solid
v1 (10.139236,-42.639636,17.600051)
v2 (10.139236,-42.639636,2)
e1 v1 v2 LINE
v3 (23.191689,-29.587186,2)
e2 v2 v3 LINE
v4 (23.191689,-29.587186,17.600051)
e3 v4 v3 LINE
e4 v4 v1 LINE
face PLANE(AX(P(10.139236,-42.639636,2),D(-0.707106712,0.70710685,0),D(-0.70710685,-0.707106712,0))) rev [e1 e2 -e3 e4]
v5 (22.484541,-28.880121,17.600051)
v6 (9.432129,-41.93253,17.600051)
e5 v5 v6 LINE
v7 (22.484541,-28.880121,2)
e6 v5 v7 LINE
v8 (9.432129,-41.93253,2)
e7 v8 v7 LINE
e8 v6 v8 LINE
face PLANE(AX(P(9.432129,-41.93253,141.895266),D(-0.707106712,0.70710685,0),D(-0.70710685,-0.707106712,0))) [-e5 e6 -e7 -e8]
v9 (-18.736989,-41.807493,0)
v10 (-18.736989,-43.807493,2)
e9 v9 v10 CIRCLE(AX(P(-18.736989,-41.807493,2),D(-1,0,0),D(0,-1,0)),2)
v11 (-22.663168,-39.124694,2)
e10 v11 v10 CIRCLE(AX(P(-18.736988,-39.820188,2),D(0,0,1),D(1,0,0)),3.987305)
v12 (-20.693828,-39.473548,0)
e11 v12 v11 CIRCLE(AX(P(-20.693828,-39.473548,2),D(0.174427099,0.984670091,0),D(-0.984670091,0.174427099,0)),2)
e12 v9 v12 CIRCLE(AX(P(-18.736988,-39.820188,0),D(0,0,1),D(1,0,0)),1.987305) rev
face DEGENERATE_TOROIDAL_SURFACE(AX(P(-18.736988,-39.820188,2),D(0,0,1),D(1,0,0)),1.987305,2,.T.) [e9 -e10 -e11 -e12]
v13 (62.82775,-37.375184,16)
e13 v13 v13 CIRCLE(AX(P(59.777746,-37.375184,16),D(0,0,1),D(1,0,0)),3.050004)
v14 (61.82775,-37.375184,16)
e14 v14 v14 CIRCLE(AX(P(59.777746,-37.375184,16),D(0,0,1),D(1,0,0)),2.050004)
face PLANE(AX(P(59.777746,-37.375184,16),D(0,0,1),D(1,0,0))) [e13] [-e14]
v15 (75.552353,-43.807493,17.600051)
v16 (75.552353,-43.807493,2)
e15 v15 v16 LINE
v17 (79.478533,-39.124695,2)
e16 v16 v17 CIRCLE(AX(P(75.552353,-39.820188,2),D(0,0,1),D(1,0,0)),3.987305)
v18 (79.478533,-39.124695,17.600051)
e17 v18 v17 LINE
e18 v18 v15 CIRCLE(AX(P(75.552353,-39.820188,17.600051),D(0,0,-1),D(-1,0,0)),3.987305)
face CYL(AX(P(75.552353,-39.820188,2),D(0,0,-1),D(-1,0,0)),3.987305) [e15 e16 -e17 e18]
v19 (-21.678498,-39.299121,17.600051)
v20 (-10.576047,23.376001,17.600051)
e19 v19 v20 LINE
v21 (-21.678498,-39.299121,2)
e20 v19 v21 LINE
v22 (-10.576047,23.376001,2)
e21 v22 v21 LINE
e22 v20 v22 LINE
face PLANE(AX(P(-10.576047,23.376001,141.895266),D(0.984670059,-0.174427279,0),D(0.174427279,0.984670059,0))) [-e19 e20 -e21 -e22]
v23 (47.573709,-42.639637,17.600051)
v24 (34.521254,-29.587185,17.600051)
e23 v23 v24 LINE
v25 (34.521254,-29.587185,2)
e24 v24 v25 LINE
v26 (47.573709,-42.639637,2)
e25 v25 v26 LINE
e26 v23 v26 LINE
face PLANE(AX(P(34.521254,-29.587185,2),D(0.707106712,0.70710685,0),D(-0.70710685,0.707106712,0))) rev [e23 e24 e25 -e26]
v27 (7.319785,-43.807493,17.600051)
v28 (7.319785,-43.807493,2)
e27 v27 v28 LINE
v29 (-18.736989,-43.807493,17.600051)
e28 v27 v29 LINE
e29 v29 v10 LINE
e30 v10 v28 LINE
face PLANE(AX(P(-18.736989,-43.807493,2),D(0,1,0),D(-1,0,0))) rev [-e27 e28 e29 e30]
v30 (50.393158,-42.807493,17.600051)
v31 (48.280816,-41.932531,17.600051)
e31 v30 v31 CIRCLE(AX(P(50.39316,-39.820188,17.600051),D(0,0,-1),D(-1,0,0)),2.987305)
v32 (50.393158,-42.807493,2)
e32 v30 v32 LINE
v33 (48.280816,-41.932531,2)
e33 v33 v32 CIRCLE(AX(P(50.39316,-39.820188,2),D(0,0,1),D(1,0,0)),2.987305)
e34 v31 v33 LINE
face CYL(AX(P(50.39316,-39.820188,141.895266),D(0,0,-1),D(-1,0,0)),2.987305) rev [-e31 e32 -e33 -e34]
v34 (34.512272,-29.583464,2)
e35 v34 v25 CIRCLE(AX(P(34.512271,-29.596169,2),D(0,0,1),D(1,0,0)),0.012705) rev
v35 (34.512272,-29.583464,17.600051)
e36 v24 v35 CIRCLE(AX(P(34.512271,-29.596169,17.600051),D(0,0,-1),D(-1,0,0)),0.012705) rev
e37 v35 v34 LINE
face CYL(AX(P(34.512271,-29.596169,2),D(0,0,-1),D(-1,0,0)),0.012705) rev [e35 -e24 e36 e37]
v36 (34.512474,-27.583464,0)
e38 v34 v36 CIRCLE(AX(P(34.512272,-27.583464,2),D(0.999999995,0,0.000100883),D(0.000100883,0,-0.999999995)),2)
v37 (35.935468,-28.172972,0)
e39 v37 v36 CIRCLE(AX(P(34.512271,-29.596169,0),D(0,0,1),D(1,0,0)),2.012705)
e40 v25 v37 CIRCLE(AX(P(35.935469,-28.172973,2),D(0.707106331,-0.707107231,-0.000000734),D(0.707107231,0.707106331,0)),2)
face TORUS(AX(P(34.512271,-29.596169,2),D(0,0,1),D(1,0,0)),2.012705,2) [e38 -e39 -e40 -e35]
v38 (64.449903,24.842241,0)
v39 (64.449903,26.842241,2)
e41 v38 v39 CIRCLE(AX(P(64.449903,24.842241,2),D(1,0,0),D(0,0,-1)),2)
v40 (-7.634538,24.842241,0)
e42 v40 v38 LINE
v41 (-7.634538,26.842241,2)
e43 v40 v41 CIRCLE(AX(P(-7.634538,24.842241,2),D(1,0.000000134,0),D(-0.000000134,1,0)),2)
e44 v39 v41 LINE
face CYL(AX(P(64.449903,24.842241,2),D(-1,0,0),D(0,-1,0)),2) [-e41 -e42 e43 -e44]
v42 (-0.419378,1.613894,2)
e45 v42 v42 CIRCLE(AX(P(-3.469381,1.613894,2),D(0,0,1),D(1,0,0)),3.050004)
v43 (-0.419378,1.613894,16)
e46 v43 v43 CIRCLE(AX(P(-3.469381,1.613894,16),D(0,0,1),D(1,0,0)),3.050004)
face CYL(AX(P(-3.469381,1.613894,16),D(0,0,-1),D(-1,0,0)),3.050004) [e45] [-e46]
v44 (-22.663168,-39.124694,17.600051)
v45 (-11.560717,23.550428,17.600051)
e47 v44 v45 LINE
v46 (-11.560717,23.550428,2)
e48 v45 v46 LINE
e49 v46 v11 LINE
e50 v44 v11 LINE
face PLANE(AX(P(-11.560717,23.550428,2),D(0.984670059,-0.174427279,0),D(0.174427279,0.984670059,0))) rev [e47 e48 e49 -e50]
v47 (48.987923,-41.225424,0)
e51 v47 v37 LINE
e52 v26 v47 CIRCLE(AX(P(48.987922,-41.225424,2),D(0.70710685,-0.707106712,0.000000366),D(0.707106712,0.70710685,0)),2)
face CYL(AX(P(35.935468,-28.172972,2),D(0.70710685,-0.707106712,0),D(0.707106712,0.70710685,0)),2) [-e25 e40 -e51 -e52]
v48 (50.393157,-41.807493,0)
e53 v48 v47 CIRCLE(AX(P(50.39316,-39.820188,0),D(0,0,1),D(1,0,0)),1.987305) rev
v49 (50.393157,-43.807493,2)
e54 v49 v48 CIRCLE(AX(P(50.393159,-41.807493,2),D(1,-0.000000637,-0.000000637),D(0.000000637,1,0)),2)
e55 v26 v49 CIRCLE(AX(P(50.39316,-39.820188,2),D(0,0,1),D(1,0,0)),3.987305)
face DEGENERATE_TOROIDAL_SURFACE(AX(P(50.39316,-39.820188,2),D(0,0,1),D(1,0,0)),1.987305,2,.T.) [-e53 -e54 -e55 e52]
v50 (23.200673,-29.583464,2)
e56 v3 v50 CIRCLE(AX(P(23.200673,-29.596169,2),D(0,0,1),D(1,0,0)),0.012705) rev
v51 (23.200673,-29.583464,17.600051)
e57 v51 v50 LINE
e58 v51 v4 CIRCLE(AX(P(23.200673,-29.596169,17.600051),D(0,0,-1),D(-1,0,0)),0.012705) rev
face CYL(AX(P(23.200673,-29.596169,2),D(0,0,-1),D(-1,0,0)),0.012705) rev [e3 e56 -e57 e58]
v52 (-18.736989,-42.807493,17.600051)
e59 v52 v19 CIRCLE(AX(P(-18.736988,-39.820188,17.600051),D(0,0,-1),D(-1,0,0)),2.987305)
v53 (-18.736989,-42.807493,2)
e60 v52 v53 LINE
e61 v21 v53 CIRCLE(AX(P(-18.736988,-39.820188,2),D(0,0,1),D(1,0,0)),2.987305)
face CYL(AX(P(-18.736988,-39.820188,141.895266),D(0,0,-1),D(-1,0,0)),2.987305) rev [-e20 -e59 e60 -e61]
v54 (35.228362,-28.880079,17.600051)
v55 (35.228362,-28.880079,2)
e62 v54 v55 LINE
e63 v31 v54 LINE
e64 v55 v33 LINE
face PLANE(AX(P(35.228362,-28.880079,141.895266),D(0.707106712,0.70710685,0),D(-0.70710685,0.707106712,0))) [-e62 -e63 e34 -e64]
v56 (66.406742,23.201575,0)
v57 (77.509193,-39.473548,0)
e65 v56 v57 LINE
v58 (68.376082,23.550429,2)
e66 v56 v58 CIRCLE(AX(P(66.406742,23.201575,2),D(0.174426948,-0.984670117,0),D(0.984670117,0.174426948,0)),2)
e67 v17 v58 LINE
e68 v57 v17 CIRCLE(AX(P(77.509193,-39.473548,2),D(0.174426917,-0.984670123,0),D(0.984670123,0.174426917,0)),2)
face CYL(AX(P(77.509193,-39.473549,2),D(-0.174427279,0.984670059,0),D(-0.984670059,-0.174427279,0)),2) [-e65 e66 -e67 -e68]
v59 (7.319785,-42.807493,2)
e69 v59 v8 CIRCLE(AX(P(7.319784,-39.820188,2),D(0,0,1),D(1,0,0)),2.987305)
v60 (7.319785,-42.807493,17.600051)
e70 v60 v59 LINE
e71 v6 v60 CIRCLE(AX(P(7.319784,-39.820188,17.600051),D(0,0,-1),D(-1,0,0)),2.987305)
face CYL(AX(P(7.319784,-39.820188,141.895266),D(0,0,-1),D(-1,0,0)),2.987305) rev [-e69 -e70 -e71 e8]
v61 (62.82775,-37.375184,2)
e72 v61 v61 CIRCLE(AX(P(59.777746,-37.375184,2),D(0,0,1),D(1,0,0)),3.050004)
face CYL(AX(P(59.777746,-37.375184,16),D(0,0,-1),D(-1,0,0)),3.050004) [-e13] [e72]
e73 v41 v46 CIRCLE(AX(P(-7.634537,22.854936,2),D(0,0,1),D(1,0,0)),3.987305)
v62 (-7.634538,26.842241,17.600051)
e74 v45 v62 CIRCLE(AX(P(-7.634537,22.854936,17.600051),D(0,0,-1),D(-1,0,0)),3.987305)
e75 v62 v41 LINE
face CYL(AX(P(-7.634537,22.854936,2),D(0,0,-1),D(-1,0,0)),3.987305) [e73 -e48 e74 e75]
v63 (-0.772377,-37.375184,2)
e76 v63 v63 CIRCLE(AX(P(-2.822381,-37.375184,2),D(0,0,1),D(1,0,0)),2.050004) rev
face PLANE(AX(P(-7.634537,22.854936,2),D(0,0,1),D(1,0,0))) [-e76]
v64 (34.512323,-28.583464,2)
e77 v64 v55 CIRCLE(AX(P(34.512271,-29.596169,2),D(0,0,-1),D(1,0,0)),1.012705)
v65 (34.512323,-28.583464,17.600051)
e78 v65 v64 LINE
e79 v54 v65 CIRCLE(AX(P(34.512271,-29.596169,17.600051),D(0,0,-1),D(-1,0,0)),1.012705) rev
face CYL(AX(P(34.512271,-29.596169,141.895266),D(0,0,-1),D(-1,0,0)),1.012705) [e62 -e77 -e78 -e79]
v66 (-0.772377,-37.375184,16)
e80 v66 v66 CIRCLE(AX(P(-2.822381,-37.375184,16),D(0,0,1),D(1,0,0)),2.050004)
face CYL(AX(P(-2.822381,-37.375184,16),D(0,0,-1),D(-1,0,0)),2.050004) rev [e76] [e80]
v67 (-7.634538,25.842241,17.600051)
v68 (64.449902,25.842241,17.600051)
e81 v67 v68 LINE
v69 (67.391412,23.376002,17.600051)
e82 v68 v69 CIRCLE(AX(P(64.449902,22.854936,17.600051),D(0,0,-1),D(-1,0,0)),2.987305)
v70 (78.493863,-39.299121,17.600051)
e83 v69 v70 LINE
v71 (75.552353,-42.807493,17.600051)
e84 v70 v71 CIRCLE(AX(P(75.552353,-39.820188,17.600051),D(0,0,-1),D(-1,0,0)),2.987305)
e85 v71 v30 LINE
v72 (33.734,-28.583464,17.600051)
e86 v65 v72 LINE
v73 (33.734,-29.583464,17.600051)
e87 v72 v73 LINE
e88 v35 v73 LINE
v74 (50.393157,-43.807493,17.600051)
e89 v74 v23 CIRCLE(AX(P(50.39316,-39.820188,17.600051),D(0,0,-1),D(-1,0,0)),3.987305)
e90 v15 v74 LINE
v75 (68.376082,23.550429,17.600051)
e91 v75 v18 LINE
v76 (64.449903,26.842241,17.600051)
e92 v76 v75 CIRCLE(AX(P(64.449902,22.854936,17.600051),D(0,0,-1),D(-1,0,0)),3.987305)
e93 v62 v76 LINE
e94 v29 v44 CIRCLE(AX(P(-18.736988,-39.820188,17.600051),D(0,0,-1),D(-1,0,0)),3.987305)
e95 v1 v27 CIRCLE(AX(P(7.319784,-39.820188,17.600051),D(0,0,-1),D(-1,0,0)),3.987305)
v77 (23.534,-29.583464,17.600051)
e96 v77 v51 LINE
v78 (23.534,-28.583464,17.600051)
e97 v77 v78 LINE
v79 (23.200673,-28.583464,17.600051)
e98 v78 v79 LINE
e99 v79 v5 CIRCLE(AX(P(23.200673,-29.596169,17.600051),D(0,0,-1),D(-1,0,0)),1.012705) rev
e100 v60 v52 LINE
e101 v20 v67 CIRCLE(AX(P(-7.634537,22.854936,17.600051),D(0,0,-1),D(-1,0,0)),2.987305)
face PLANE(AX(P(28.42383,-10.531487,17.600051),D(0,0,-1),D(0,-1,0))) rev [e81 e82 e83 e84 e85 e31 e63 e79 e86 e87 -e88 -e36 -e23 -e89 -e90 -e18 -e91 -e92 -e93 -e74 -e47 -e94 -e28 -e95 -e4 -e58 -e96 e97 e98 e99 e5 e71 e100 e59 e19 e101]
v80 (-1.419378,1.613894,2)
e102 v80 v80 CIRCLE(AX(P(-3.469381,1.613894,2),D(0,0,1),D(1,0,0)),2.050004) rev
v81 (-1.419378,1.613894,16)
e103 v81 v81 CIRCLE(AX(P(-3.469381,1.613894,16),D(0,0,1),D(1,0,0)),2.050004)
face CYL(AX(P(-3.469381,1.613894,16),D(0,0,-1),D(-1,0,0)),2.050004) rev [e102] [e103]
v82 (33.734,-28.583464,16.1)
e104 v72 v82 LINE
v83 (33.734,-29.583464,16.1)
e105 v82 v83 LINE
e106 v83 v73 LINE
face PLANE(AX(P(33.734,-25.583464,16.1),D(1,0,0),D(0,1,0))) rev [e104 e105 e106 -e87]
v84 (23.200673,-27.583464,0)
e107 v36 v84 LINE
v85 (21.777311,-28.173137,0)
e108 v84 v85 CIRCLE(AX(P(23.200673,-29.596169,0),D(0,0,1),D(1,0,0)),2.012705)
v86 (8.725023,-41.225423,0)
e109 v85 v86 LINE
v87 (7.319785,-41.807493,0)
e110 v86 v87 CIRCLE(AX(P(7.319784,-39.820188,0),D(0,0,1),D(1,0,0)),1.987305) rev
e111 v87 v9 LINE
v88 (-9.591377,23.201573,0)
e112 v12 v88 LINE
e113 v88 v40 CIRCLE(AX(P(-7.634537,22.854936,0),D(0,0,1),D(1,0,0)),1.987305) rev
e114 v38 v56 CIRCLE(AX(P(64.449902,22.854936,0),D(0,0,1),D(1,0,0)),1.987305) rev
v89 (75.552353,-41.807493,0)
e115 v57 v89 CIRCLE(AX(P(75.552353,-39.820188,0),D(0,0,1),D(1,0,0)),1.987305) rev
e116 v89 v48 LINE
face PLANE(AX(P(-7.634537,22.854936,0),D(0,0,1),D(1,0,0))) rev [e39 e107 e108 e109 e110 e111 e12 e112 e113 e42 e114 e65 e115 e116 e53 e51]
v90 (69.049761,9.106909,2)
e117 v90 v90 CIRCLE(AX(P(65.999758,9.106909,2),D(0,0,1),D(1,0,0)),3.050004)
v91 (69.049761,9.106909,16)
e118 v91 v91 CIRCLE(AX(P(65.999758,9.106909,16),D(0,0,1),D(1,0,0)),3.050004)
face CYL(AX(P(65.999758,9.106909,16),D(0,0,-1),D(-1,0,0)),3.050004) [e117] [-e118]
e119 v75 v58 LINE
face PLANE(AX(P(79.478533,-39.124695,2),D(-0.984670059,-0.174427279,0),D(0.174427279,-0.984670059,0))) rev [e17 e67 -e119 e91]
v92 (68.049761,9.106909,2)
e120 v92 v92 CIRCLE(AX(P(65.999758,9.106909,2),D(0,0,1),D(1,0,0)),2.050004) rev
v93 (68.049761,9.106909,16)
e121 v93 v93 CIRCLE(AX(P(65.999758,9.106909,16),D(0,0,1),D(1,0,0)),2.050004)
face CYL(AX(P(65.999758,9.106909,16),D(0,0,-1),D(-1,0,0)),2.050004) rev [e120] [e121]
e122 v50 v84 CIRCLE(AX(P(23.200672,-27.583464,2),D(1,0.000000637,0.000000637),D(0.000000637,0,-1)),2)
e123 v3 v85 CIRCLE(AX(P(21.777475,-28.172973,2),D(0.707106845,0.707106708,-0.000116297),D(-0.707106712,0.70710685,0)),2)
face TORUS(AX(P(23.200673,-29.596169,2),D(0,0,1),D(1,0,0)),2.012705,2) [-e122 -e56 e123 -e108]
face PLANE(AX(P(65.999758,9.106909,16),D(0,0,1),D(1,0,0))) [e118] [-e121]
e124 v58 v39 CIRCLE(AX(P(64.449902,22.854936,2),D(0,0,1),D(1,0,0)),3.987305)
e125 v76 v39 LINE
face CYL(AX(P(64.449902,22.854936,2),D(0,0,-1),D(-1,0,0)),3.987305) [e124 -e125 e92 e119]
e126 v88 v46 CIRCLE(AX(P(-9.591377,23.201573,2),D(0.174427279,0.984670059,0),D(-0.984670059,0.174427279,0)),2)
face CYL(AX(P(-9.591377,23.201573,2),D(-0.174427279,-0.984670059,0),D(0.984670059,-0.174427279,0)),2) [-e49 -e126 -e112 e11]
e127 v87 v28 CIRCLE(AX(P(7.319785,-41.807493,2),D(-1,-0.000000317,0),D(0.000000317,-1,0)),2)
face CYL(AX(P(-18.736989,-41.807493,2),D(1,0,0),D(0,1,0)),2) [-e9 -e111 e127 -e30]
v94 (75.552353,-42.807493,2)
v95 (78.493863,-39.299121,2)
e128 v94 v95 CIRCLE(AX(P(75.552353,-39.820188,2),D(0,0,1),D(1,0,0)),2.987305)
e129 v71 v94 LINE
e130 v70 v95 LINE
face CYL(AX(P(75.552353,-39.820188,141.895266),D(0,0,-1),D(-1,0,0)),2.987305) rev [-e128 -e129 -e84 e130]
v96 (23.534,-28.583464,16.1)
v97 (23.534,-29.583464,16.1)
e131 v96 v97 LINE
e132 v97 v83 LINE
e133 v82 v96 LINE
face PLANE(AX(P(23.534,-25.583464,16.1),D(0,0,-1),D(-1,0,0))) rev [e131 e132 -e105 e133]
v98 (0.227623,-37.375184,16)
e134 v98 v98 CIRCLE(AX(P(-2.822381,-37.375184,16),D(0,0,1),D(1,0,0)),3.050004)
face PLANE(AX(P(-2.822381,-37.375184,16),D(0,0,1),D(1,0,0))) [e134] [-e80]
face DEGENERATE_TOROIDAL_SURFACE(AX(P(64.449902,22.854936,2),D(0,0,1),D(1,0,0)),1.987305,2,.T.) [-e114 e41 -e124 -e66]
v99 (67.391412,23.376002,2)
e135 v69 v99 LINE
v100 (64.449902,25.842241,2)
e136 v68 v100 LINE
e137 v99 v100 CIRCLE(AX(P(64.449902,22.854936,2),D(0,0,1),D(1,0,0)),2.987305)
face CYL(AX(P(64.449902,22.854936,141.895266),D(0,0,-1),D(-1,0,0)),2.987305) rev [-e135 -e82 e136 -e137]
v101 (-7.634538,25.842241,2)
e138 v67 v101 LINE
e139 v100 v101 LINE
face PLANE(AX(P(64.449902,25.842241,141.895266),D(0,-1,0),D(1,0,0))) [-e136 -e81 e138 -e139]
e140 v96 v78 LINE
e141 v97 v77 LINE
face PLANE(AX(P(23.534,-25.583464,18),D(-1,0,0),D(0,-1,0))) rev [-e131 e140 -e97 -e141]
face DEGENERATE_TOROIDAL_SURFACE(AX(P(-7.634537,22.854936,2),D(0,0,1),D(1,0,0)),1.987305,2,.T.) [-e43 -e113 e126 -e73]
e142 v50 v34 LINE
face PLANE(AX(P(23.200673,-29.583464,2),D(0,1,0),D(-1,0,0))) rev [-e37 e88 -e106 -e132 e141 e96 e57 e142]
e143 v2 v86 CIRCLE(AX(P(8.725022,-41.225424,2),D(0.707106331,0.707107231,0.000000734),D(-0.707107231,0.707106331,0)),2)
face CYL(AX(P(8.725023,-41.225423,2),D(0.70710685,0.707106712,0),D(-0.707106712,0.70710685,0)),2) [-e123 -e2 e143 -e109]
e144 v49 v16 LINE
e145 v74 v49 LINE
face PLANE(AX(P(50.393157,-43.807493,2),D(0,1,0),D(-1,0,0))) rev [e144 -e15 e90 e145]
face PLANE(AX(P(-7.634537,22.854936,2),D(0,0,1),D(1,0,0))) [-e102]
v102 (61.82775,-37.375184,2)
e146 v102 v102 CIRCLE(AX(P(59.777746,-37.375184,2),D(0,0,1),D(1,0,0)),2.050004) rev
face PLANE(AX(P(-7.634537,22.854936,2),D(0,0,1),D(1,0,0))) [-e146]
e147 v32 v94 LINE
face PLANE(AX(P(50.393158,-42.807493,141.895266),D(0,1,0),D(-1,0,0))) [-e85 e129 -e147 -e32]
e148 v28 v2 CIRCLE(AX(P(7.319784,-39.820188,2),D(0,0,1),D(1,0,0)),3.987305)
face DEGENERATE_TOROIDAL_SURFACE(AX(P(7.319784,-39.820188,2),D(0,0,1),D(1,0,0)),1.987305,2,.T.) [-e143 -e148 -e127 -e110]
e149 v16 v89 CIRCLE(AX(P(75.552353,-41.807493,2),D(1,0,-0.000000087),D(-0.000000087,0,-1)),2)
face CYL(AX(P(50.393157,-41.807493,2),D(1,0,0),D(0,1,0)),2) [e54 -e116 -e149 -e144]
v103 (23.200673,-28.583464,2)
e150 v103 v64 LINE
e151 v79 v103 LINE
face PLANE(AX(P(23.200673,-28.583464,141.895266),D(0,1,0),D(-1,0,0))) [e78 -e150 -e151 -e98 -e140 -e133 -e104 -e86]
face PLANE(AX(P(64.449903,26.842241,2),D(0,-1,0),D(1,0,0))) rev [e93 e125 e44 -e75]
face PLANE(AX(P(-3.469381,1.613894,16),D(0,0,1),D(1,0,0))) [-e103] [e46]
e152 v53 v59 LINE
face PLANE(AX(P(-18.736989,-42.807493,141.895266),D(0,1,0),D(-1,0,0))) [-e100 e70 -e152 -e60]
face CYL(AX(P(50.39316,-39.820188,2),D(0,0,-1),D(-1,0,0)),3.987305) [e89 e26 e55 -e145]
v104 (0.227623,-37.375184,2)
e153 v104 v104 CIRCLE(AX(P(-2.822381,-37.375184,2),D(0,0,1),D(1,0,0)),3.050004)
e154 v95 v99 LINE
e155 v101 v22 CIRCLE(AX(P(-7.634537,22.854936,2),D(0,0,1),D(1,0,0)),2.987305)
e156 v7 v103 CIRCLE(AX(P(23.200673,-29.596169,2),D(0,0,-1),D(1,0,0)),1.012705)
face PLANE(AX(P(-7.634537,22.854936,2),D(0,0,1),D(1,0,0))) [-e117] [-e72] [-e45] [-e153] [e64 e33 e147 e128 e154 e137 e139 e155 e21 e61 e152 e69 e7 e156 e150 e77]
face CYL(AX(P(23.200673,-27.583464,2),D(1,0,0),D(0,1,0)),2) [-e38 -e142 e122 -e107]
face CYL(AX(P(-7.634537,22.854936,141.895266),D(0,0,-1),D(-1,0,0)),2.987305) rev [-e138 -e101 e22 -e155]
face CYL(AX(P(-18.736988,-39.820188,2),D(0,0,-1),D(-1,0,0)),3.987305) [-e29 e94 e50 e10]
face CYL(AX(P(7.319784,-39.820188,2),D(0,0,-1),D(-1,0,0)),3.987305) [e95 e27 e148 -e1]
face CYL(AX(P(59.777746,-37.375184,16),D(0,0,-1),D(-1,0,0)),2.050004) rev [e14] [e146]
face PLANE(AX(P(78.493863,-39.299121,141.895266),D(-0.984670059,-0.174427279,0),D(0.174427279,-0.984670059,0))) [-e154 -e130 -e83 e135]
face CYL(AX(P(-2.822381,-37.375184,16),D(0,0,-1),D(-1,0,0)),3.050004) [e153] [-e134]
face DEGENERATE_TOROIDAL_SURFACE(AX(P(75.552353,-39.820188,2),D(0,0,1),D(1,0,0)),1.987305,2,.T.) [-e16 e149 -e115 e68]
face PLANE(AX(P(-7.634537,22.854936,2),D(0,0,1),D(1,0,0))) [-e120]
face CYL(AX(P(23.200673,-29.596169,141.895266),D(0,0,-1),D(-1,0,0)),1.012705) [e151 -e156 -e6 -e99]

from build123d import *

# Parameters (mm, degrees)
EXTRUDE_1_DEPTH                    = 2
EXTRUDE_2_DEPTH                    = 14
EXTRUDE_3_DEPTH                    = 15.6000508
FILLET_1_R                         = 2
SKETCH_12_W                        = 10.2
SKETCH_12_H                        = 1.9
USB_TYPEC_LOWER_HALF_OPENING_DEPTH = 4


with BuildPart() as part:
    # 草图1 → 凸台-拉伸1 (new body)
    with BuildSketch(Plane.XY):
        with BuildLine():
            Line((-18.736989068, -43.807492656), (7.319785463, -43.807492656))
            ThreePointArc((7.319785463, -43.807492656), (8.845661337, -43.503976443), (10.139236063, -42.639636403))
            Line((10.139236063, -42.639636403), (23.19168867, -29.587186336))
            ThreePointArc((23.19168867, -29.587186336), (23.195810689, -29.58443157), (23.200673199, -29.583464208))
            Line((23.200673199, -29.583464208), (34.512272144, -29.583464208))
            ThreePointArc((34.512272144, -29.583464208), (34.51713329, -29.584431533), (34.521254362, -29.587185298))
            Line((34.521254362, -29.587185298), (47.573709045, -42.639637441))
            ThreePointArc((47.573709045, -42.639637441), (48.867282822, -43.503976481), (50.393157333, -43.807492656))
            Line((50.393157333, -43.807492656), (75.552353414, -43.807492656))
            ThreePointArc((75.552353414, -43.807492656), (78.607819066, -42.38196989), (79.478533005, -39.124694535))
            Line((79.478533005, -39.124694535), (68.376081771, 23.550429382))
            ThreePointArc((68.376081771, 23.550429382), (67.011684276, 25.910401612), (64.449902577, 26.842240644))
            Line((64.449902577, 26.842240644), (-7.634537883, 26.842240644))
            ThreePointArc((-7.634537883, 26.842240644), (-10.196320099, 25.910401179), (-11.560717313, 23.550428053))
            Line((-11.560717313, 23.550428053), (-22.663168183, -39.124693813))
            ThreePointArc((-22.663168183, -39.124693813), (-21.792454719, -42.381969476), (-18.736989068, -43.807492656))
        make_face()
    extrude(amount=EXTRUDE_1_DEPTH)

    # 草图4 → 凸台-拉伸2 (add)
    # profile 1 of 4: a face of its own
    with BuildSketch(Plane.XY.offset(2)):
        with BuildLine():
            ThreePointArc((-5.872384963, -37.375183791), (-2.822381153, -40.425187601), (0.227622657, -37.375183791))
            ThreePointArc((0.227622657, -37.375183791), (-2.822381153, -34.325179981), (-5.872384963, -37.375183791))
        make_face()
        with BuildLine():
            ThreePointArc((-0.772377343, -37.375183791), (-2.822381153, -35.325179981), (-4.872384963, -37.375183791))
            ThreePointArc((-4.872384963, -37.375183791), (-2.822381153, -39.425187601), (-0.772377343, -37.375183791))
        make_face(mode=Mode.SUBTRACT)
    # profile 2 of 4: a face of its own
    with BuildSketch(Plane.XY.offset(2)):
        with BuildLine():
            ThreePointArc((56.727742037, -37.375183791), (59.777745847, -40.425187601), (62.827749657, -37.375183791))
            ThreePointArc((62.827749657, -37.375183791), (59.777745847, -34.325179981), (56.727742037, -37.375183791))
        make_face()
        with BuildLine():
            ThreePointArc((61.827749657, -37.375183791), (59.777745847, -35.325179981), (57.727742037, -37.375183791))
            ThreePointArc((57.727742037, -37.375183791), (59.777745847, -39.425187601), (61.827749657, -37.375183791))
        make_face(mode=Mode.SUBTRACT)
    # profile 3 of 4: a face of its own
    with BuildSketch(Plane.XY.offset(2)):
        with BuildLine():
            ThreePointArc((69.049761341, 9.106909173), (65.999757531, 12.156912983), (62.949753721, 9.106909173))
            ThreePointArc((62.949753721, 9.106909173), (65.999757531, 6.056905363), (69.049761341, 9.106909173))
        make_face()
        with BuildLine():
            ThreePointArc((63.949753721, 9.106909173), (65.999757531, 7.056905363), (68.049761341, 9.106909173))
            ThreePointArc((68.049761341, 9.106909173), (65.999757531, 11.156912983), (63.949753721, 9.106909173))
        make_face(mode=Mode.SUBTRACT)
    # profile 4 of 4: a face of its own
    with BuildSketch(Plane.XY.offset(2)):
        with BuildLine():
            ThreePointArc((-6.519385217, 1.613894187), (-3.469381407, -1.436109623), (-0.419377597, 1.613894187))
            ThreePointArc((-0.419377597, 1.613894187), (-3.469381407, 4.663897997), (-6.519385217, 1.613894187))
        make_face()
        with BuildLine():
            ThreePointArc((-1.419377597, 1.613894187), (-3.469381407, 3.663897997), (-5.519385217, 1.613894187))
            ThreePointArc((-5.519385217, 1.613894187), (-3.469381407, -0.436109623), (-1.419377597, 1.613894187))
        make_face(mode=Mode.SUBTRACT)
    extrude(amount=EXTRUDE_2_DEPTH)

    # 草图6 → 凸台-拉伸3 (add)
    with BuildSketch(Plane.XY.offset(2)):
        with BuildLine():
            Line((-11.560717313, 23.550428053), (-22.663168183, -39.124693813))
            ThreePointArc((-22.663168183, -39.124693813), (-21.792454719, -42.381969476), (-18.736989068, -43.807492656))
            Line((-18.736989068, -43.807492656), (7.319785463, -43.807492656))
            ThreePointArc((7.319785463, -43.807492656), (8.845661337, -43.503976443), (10.139236063, -42.639636403))
            Line((10.139236063, -42.639636403), (23.19168867, -29.587186337))
            ThreePointArc((23.19168867, -29.587186337), (23.195810689, -29.58443157), (23.200673199, -29.583464208))
            Line((23.200673199, -29.583464208), (34.512272144, -29.583464208))
            ThreePointArc((34.512272144, -29.583464208), (34.51713329, -29.584431533), (34.521254362, -29.587185298))
            Line((34.521254362, -29.587185298), (47.573709045, -42.639637441))
            ThreePointArc((47.573709045, -42.639637441), (48.867282822, -43.503976481), (50.393157333, -43.807492656))
            Line((50.393157333, -43.807492656), (75.552353414, -43.807492656))
            ThreePointArc((75.552353414, -43.807492656), (78.607819066, -42.38196989), (79.478533005, -39.124694535))
            Line((79.478533005, -39.124694535), (68.376081771, 23.550429382))
            ThreePointArc((68.376081771, 23.550429382), (67.011684276, 25.910401612), (64.449902577, 26.842240644))
            Line((64.449902577, 26.842240644), (-7.634537883, 26.842240644))
            ThreePointArc((-7.634537883, 26.842240644), (-10.196320099, 25.910401179), (-11.560717313, 23.550428053))
        make_face()
        with BuildLine():
            Line((-10.576047254, 23.376000774), (-21.678498124, -39.299121091))
            ThreePointArc((-21.678498124, -39.299121091), (-21.026156001, -41.739485021), (-18.736988894, -42.807492656))
            Line((-18.736988894, -42.807492656), (7.319785463, -42.807492656))
            ThreePointArc((7.319785463, -42.807492656), (8.462977611, -42.580097033), (9.432128831, -41.932530072))
            Line((9.432128831, -41.932530072), (22.484540842, -28.880120606))
            ThreePointArc((22.484540842, -28.880120606), (22.813100147, -28.660563268), (23.200672562, -28.583464208))
            Line((23.200672562, -28.583464208), (34.512322586, -28.58346421))
            ThreePointArc((34.512322586, -28.58346421), (34.899840317, -28.660561774), (35.228361593, -28.880078967))
            Line((35.228361593, -28.880078967), (48.280815757, -41.932530591))
            ThreePointArc((48.280815757, -41.932530591), (49.249966503, -42.580097051), (50.393157969, -42.807492656))
            Line((50.393157969, -42.807492656), (75.552353414, -42.807492656))
            ThreePointArc((75.552353414, -42.807492656), (77.841520522, -41.739485228), (78.493862882, -39.299121453))
            Line((78.493862882, -39.299121453), (67.391411713, 23.376002103))
            ThreePointArc((67.391411713, 23.376002103), (66.369199703, 25.144102993), (64.449902443, 25.842240644))
            Line((64.449902443, 25.842240644), (-7.634537883, 25.842240644))
            ThreePointArc((-7.634537883, 25.842240644), (-9.553835577, 25.144102517), (-10.576047254, 23.376000774))
        make_face(mode=Mode.SUBTRACT)
    extrude(amount=EXTRUDE_3_DEPTH)

    # 圆角1
    fillet_1_edges = [part.edges().sort_by_distance(p)[0] for p in [
        (28.407682347, 26.842240644, 0),
        (67.011684276, 25.910401612, 0),
        (73.927307388, -7.787132577, 0),
        (78.607819066, -42.38196989, 0),
        (62.972755373, -43.807492656, 0),
        (48.867282822, -43.503976481, 0),
        (41.047481703, -36.11341137, 0),
        (34.51713329, -29.584431533, 0),
        (28.856472671, -29.583464208, 0),
        (23.195810689, -29.58443157, 0),
        (16.665462366, -36.11341137, 0),
        (8.845661337, -43.503976443, 0),
        (-5.708601803, -43.807492656, 0),
        (-21.792454719, -42.381969476, 0),
        (-17.111942748, -7.78713288, 0),
        (-10.196320099, 25.910401179, 0),
    ]]
    fillet(fillet_1_edges, radius=FILLET_1_R - 0.0001)  # a hair under: the kernel refuses the full size

    # 草图12 → USB_TypeC_Lower_Half_Opening (cut)
    with BuildSketch(Plane.XZ.offset(29.583464208)):
        with Locations((28.634, 17.05)):
            Rectangle(SKETCH_12_W, SKETCH_12_H)
    extrude(amount=-USB_TYPEC_LOWER_HALF_OPENING_DEPTH, mode=Mode.SUBTRACT)


solid = part.part
